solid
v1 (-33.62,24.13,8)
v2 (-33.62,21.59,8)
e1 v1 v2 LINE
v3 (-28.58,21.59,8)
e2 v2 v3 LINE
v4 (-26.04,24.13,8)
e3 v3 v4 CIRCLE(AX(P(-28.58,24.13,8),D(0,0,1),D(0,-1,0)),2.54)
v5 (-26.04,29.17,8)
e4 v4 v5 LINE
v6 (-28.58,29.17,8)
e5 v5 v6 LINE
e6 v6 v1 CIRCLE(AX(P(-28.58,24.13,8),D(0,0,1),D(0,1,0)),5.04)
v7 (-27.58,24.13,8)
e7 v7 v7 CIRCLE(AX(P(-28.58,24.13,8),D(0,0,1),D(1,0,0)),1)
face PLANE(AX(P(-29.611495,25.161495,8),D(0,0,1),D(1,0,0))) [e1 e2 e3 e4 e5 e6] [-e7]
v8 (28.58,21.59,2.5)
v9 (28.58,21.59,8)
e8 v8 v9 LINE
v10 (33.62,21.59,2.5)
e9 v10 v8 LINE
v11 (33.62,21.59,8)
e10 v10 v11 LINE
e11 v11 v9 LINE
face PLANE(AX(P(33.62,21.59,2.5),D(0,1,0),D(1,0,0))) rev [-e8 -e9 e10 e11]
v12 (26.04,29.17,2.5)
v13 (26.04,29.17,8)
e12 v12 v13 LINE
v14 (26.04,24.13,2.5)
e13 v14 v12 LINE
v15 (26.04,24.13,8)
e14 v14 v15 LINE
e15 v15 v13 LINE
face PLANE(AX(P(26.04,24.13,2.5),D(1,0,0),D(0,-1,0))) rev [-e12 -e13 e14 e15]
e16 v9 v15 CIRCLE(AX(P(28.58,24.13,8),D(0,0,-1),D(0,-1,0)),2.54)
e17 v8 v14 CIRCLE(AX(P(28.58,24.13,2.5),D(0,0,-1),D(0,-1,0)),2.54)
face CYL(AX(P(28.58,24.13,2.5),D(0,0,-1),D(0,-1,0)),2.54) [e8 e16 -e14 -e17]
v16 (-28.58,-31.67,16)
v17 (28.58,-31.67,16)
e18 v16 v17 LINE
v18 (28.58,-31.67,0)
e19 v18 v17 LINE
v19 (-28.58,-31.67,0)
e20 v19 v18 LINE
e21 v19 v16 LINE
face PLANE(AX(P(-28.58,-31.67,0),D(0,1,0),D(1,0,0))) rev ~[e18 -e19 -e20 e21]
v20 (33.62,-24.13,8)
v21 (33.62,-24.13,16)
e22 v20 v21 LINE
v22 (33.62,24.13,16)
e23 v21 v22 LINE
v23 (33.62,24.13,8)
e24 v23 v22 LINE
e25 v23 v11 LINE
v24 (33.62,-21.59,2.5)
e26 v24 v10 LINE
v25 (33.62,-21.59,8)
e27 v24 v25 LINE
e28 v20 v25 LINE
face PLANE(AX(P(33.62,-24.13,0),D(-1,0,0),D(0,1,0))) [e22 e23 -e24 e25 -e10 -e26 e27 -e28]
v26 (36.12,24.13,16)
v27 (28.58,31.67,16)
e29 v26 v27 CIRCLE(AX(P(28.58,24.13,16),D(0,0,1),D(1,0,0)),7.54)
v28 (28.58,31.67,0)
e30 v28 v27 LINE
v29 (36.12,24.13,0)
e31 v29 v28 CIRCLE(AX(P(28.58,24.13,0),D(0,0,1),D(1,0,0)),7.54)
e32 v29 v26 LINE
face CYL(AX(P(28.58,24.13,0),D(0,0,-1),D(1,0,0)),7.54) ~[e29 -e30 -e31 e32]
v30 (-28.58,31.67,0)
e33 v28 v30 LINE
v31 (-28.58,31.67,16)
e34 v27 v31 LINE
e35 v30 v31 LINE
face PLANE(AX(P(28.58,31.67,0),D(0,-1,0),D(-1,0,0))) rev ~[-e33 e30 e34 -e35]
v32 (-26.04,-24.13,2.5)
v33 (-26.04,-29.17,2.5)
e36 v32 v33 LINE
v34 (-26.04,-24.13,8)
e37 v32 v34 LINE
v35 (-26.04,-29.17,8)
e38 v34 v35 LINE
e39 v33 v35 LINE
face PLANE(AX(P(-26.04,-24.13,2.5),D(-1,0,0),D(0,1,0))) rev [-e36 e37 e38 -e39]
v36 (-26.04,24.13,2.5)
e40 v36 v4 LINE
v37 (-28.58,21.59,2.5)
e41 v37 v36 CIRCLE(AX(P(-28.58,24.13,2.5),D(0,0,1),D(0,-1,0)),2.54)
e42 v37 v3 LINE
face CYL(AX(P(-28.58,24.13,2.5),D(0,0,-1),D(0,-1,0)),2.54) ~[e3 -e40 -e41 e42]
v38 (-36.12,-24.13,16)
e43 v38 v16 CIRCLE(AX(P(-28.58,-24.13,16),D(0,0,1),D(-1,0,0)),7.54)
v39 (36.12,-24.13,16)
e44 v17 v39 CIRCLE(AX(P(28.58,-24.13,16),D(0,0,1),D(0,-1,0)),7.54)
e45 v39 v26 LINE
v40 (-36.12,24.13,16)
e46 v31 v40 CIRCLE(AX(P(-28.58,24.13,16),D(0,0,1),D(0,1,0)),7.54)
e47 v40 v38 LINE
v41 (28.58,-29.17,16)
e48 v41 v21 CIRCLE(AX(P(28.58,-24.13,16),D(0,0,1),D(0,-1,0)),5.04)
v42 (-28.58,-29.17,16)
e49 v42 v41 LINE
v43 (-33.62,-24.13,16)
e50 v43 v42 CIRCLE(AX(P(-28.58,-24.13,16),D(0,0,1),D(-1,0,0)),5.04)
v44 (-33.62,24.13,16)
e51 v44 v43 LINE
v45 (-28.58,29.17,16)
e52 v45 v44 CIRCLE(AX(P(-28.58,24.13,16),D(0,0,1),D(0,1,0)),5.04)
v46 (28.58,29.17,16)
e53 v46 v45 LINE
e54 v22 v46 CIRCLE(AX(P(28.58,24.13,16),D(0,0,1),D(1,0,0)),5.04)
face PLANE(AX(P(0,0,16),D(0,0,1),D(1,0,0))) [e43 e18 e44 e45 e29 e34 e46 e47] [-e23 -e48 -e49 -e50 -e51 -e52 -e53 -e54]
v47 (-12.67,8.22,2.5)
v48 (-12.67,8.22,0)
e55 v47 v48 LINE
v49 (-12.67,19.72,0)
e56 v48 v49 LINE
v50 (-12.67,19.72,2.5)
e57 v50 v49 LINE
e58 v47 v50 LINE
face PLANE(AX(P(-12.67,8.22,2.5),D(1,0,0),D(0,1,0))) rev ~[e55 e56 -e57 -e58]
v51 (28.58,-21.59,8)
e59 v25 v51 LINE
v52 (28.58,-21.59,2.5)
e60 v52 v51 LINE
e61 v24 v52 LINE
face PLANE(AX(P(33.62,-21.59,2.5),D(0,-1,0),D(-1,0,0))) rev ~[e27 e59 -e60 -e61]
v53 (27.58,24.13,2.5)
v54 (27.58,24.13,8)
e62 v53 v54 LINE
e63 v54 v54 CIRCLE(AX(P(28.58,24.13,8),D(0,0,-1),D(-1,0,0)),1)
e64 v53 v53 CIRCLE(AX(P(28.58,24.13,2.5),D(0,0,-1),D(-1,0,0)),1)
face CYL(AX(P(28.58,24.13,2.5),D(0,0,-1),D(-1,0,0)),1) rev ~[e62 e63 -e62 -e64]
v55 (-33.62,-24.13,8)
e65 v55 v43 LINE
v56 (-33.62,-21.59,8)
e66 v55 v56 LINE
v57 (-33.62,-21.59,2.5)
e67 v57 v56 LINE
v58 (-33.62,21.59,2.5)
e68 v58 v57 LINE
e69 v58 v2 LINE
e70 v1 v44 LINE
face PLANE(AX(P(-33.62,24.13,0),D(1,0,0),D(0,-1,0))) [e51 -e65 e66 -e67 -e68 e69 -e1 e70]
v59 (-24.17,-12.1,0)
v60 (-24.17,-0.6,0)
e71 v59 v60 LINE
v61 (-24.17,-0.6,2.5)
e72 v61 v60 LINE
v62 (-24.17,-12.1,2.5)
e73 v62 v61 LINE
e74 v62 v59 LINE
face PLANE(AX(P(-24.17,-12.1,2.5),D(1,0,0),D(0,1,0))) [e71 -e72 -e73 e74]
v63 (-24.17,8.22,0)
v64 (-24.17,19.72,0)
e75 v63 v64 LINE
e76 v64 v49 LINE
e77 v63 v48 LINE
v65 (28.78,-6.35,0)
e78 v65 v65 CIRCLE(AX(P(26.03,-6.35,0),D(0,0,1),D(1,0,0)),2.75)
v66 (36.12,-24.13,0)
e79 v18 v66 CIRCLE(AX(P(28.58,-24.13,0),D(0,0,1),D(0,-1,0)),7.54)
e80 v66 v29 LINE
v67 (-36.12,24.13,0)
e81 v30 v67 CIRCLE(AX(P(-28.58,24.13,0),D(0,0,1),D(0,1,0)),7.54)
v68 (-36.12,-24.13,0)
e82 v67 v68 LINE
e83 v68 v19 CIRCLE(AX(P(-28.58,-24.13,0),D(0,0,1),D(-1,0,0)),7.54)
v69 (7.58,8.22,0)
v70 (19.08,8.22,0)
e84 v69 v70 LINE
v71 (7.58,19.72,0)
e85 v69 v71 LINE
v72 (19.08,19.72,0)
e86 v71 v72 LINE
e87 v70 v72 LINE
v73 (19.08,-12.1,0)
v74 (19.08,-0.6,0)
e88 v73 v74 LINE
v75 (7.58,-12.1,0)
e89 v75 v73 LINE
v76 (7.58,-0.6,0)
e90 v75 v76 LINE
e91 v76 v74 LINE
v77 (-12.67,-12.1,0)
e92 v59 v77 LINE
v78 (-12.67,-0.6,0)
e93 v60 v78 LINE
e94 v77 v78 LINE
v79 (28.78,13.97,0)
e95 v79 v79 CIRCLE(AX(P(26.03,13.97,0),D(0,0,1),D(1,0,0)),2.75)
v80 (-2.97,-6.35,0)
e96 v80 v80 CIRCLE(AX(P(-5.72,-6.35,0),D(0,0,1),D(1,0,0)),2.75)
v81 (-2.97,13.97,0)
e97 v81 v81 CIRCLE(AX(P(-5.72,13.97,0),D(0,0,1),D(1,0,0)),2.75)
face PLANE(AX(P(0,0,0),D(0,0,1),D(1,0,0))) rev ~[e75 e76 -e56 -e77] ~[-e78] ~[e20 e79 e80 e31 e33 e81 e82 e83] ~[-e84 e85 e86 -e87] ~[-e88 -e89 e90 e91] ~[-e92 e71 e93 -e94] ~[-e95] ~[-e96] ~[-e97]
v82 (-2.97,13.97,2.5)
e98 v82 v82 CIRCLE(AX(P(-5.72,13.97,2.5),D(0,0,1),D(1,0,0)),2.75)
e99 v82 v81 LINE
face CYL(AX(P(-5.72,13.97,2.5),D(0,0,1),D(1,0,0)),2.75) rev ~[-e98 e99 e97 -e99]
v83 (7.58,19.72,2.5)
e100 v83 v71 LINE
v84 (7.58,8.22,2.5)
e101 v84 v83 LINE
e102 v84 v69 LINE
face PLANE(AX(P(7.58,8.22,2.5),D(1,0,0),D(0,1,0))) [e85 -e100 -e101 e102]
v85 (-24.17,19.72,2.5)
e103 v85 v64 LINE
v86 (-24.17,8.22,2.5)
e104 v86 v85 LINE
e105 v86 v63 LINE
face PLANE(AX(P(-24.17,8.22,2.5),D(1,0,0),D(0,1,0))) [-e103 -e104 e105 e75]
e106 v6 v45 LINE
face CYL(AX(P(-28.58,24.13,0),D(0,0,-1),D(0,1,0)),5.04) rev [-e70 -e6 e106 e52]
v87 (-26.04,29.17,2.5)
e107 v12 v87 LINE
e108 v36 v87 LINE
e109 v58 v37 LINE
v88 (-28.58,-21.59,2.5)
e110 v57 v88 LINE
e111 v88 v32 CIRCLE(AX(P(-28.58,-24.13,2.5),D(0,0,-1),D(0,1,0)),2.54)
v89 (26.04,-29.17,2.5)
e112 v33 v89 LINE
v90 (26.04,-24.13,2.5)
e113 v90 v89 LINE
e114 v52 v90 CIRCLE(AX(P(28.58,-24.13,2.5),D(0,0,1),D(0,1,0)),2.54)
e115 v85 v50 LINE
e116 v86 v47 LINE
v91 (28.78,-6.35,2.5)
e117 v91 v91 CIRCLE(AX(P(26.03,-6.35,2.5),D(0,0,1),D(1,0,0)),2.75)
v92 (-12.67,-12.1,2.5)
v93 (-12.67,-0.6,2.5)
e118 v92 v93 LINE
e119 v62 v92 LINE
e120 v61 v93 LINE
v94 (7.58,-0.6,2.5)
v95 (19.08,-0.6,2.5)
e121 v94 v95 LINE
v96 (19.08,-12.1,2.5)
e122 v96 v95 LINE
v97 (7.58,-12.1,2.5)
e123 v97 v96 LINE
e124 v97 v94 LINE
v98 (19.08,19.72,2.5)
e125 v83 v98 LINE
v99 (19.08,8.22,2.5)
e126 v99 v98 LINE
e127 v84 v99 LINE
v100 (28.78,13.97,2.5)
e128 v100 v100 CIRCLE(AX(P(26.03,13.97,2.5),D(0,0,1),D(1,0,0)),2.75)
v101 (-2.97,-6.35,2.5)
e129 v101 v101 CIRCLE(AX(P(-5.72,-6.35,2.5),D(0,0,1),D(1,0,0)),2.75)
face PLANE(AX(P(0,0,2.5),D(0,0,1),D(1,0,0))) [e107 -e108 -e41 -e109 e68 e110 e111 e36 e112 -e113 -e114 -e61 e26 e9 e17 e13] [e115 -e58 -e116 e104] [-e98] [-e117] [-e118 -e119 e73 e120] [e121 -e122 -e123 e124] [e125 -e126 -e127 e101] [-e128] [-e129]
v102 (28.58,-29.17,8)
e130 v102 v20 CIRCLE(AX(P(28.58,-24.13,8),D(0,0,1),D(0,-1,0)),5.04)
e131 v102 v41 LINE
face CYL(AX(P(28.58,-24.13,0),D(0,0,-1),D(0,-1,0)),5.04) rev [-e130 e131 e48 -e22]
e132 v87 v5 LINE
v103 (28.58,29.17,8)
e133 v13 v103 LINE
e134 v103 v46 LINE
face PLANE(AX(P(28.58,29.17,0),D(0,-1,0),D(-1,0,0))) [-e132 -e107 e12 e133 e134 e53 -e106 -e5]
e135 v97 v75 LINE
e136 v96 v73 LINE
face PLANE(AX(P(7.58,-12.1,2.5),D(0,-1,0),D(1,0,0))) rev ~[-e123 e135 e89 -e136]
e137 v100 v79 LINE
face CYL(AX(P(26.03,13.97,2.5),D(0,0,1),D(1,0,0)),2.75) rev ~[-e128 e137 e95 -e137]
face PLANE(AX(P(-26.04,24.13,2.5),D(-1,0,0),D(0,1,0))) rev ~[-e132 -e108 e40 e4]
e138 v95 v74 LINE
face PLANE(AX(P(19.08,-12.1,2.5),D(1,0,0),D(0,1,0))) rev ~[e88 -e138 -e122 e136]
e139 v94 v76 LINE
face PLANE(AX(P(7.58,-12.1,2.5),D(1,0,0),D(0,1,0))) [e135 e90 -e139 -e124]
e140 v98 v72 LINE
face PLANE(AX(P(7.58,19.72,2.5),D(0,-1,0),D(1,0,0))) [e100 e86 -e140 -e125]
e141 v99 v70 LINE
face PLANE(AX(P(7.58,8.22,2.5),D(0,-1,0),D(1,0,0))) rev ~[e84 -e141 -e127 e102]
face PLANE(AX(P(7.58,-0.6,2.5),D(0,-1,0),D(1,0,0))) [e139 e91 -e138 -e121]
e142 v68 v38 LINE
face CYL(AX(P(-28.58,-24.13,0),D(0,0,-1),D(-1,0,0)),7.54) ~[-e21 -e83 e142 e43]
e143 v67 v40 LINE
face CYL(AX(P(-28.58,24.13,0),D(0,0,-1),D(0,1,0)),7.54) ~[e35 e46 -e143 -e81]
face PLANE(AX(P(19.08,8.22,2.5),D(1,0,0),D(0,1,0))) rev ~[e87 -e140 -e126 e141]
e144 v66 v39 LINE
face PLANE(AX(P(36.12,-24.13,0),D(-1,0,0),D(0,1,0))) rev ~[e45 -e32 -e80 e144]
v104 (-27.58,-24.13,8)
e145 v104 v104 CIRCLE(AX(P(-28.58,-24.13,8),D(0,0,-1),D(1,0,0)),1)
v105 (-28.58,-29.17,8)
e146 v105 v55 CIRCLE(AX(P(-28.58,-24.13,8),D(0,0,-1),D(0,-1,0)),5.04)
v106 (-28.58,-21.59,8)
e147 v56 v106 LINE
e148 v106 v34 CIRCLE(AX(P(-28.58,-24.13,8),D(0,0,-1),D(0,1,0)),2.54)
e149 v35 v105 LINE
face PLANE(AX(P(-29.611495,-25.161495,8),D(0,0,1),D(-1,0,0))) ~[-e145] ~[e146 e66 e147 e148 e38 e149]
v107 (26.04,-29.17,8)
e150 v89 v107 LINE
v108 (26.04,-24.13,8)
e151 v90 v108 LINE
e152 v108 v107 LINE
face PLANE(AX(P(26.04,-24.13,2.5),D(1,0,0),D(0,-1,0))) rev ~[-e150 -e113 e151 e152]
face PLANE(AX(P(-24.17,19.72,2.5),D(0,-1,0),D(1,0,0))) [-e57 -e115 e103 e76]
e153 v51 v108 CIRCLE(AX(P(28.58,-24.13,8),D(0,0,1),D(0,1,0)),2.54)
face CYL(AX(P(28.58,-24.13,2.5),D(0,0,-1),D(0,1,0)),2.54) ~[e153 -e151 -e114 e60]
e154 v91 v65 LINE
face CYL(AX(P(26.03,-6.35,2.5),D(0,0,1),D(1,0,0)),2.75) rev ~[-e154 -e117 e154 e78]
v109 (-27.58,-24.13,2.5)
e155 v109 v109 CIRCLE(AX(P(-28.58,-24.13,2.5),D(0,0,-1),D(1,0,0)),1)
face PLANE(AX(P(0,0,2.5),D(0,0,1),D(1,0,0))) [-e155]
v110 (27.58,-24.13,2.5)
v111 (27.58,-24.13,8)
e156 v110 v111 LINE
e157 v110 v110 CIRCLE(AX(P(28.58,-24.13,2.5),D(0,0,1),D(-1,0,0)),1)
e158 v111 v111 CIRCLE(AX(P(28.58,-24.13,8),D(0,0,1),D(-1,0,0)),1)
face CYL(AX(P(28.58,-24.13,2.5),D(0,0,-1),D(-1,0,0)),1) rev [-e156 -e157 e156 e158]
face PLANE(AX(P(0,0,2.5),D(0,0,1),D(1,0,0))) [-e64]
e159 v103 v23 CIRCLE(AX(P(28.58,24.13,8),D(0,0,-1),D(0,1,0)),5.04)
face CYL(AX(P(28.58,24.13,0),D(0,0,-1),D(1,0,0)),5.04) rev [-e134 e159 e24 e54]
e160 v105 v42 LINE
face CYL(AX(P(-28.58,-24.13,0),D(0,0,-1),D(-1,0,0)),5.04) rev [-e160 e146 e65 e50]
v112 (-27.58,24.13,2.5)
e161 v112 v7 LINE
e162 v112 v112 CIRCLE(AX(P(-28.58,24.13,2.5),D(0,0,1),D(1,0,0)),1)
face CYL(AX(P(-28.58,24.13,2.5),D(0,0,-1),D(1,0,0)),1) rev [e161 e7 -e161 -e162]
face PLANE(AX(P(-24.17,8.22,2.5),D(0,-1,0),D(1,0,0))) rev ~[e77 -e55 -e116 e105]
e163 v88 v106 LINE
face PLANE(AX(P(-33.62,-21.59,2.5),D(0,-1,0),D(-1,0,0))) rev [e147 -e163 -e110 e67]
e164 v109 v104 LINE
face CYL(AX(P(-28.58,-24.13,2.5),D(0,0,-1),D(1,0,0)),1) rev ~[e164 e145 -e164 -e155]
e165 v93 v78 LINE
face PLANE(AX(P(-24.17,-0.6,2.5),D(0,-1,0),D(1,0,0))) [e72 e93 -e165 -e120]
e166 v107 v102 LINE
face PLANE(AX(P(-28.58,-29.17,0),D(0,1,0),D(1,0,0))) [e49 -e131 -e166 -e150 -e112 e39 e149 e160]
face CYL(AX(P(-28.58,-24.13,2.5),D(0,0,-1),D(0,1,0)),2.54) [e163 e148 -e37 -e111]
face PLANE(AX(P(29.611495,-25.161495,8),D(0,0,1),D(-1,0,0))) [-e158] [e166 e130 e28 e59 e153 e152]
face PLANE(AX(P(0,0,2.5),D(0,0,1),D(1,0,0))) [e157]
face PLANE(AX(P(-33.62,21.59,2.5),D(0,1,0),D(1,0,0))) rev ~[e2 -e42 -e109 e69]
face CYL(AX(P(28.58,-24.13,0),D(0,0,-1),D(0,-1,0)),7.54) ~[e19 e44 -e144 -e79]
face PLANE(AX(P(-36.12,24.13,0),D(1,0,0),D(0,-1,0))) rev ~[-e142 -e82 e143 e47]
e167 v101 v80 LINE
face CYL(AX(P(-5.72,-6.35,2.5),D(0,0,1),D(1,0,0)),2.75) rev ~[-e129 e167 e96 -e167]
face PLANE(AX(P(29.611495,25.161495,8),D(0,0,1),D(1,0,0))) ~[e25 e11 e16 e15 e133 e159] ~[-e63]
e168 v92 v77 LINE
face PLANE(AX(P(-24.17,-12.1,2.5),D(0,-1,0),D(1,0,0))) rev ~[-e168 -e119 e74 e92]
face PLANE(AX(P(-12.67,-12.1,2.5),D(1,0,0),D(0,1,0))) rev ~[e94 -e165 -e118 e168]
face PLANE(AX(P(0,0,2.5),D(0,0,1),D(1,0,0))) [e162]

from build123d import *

# Parameters (mm, degrees)
F1_DEPTH         = 16
F2_T             = -2.5
F3_R             = 1
F4_DEPTH         = 5.5
F4_COPIES2_COUNT = 2
F5_W             = 11.5
F5_H             = 11.5
F5_R             = 2.75
F6_DEPTH         = 2.501


# Not quite as in the source:
# - a pattern or mirror of a feature is missing from the dataset's text; its kind, count and spacing are read off the source's solid


with BuildPart() as f1:
    # F0 (on Top) → F1 (new body)
    with BuildSketch(Plane.XY):
        with BuildLine():
            ThreePointArc((36.12, 24.13), (33.9115851301, 29.4615851301), (28.58, 31.67))
            Line((28.58, 31.67), (-28.58, 31.67))
            ThreePointArc((-28.58, 31.67), (-33.9115851301, 29.4615851301), (-36.12, 24.13))
            Line((-36.12, 24.13), (-36.12, -24.13))
            ThreePointArc((-36.12, -24.13), (-33.9115851301, -29.4615851301), (-28.58, -31.67))
            Line((-28.58, -31.67), (28.58, -31.67))
            ThreePointArc((28.58, -31.67), (33.9115851301, -29.4615851301), (36.12, -24.13))
            Line((36.12, -24.13), (36.12, 24.13))
        make_face()
    extrude(amount=F1_DEPTH)

    # F2
    f2_openings = [f1.faces().sort_by_distance(p)[0] for p in [
        (0, 0, 16),
    ]]
    offset(amount=F2_T, openings=f2_openings)

    # F3 (on face) → F4 (join)
    with BuildSketch(Plane.XY.offset(2.5)):
        with BuildLine():
            Line((-26.04, 24.13), (-26.04, 29.17))
            Line((-26.04, 29.17), (-28.58, 29.17))
            ThreePointArc((-28.58, 29.17), (-32.1438181772, 27.6938181772), (-33.62, 24.13))
            Line((-33.62, 24.13), (-33.62, 21.59))
            Line((-33.62, 21.59), (-28.58, 21.59))
            ThreePointArc((-28.58, 21.59), (-26.7839487758, 22.3339487758), (-26.04, 24.13))
        make_face()
        with Locations((-28.58, 24.13)):
            Circle(F3_R, mode=Mode.SUBTRACT)
    f4 = extrude(amount=F4_DEPTH)

    # F4_copies: F4 across plane
    add(f4.mirror(Plane(origin=(0, 0, 0), x_dir=(0, 0, 1), z_dir=(1, 0, 0))))

    # F4_copies1: F4 across plane
    add(f4.mirror(Plane(origin=(0, 0, 0), x_dir=(0, 0, -1), z_dir=(0, -1, 0))))

    # F4_copies2: F4 ×2 about axis
    f4_copies2_axis = Axis((0, 0, 0), (0, 0, 1))
    for i in range(1, F4_COPIES2_COUNT):
        add(f4.rotate(f4_copies2_axis, i * 360 / F4_COPIES2_COUNT))

    # F5 (on face) → F6 (cut, through all)
    with BuildSketch(Plane.XY.offset(2.5)):
        with Locations((-18.42, 13.97)):
            Rectangle(F5_W, F5_H)
        with Locations((-5.72, 13.97)):
            Circle(F5_R)
        with Locations((-18.42, -6.35)):
            Rectangle(F5_W, F5_H)
        with Locations((-5.72, -6.35)):
            Circle(F5_R)
        with Locations((13.33, 13.97)):
            Rectangle(F5_W, F5_H)
        with Locations((26.03, 13.97)):
            Circle(F5_R)
        with Locations((13.33, -6.35)):
            Rectangle(F5_W, F5_H)
        with Locations((26.03, -6.35)):
            Circle(F5_R)
    extrude(amount=-F6_DEPTH, mode=Mode.SUBTRACT)


solid = f1.part
